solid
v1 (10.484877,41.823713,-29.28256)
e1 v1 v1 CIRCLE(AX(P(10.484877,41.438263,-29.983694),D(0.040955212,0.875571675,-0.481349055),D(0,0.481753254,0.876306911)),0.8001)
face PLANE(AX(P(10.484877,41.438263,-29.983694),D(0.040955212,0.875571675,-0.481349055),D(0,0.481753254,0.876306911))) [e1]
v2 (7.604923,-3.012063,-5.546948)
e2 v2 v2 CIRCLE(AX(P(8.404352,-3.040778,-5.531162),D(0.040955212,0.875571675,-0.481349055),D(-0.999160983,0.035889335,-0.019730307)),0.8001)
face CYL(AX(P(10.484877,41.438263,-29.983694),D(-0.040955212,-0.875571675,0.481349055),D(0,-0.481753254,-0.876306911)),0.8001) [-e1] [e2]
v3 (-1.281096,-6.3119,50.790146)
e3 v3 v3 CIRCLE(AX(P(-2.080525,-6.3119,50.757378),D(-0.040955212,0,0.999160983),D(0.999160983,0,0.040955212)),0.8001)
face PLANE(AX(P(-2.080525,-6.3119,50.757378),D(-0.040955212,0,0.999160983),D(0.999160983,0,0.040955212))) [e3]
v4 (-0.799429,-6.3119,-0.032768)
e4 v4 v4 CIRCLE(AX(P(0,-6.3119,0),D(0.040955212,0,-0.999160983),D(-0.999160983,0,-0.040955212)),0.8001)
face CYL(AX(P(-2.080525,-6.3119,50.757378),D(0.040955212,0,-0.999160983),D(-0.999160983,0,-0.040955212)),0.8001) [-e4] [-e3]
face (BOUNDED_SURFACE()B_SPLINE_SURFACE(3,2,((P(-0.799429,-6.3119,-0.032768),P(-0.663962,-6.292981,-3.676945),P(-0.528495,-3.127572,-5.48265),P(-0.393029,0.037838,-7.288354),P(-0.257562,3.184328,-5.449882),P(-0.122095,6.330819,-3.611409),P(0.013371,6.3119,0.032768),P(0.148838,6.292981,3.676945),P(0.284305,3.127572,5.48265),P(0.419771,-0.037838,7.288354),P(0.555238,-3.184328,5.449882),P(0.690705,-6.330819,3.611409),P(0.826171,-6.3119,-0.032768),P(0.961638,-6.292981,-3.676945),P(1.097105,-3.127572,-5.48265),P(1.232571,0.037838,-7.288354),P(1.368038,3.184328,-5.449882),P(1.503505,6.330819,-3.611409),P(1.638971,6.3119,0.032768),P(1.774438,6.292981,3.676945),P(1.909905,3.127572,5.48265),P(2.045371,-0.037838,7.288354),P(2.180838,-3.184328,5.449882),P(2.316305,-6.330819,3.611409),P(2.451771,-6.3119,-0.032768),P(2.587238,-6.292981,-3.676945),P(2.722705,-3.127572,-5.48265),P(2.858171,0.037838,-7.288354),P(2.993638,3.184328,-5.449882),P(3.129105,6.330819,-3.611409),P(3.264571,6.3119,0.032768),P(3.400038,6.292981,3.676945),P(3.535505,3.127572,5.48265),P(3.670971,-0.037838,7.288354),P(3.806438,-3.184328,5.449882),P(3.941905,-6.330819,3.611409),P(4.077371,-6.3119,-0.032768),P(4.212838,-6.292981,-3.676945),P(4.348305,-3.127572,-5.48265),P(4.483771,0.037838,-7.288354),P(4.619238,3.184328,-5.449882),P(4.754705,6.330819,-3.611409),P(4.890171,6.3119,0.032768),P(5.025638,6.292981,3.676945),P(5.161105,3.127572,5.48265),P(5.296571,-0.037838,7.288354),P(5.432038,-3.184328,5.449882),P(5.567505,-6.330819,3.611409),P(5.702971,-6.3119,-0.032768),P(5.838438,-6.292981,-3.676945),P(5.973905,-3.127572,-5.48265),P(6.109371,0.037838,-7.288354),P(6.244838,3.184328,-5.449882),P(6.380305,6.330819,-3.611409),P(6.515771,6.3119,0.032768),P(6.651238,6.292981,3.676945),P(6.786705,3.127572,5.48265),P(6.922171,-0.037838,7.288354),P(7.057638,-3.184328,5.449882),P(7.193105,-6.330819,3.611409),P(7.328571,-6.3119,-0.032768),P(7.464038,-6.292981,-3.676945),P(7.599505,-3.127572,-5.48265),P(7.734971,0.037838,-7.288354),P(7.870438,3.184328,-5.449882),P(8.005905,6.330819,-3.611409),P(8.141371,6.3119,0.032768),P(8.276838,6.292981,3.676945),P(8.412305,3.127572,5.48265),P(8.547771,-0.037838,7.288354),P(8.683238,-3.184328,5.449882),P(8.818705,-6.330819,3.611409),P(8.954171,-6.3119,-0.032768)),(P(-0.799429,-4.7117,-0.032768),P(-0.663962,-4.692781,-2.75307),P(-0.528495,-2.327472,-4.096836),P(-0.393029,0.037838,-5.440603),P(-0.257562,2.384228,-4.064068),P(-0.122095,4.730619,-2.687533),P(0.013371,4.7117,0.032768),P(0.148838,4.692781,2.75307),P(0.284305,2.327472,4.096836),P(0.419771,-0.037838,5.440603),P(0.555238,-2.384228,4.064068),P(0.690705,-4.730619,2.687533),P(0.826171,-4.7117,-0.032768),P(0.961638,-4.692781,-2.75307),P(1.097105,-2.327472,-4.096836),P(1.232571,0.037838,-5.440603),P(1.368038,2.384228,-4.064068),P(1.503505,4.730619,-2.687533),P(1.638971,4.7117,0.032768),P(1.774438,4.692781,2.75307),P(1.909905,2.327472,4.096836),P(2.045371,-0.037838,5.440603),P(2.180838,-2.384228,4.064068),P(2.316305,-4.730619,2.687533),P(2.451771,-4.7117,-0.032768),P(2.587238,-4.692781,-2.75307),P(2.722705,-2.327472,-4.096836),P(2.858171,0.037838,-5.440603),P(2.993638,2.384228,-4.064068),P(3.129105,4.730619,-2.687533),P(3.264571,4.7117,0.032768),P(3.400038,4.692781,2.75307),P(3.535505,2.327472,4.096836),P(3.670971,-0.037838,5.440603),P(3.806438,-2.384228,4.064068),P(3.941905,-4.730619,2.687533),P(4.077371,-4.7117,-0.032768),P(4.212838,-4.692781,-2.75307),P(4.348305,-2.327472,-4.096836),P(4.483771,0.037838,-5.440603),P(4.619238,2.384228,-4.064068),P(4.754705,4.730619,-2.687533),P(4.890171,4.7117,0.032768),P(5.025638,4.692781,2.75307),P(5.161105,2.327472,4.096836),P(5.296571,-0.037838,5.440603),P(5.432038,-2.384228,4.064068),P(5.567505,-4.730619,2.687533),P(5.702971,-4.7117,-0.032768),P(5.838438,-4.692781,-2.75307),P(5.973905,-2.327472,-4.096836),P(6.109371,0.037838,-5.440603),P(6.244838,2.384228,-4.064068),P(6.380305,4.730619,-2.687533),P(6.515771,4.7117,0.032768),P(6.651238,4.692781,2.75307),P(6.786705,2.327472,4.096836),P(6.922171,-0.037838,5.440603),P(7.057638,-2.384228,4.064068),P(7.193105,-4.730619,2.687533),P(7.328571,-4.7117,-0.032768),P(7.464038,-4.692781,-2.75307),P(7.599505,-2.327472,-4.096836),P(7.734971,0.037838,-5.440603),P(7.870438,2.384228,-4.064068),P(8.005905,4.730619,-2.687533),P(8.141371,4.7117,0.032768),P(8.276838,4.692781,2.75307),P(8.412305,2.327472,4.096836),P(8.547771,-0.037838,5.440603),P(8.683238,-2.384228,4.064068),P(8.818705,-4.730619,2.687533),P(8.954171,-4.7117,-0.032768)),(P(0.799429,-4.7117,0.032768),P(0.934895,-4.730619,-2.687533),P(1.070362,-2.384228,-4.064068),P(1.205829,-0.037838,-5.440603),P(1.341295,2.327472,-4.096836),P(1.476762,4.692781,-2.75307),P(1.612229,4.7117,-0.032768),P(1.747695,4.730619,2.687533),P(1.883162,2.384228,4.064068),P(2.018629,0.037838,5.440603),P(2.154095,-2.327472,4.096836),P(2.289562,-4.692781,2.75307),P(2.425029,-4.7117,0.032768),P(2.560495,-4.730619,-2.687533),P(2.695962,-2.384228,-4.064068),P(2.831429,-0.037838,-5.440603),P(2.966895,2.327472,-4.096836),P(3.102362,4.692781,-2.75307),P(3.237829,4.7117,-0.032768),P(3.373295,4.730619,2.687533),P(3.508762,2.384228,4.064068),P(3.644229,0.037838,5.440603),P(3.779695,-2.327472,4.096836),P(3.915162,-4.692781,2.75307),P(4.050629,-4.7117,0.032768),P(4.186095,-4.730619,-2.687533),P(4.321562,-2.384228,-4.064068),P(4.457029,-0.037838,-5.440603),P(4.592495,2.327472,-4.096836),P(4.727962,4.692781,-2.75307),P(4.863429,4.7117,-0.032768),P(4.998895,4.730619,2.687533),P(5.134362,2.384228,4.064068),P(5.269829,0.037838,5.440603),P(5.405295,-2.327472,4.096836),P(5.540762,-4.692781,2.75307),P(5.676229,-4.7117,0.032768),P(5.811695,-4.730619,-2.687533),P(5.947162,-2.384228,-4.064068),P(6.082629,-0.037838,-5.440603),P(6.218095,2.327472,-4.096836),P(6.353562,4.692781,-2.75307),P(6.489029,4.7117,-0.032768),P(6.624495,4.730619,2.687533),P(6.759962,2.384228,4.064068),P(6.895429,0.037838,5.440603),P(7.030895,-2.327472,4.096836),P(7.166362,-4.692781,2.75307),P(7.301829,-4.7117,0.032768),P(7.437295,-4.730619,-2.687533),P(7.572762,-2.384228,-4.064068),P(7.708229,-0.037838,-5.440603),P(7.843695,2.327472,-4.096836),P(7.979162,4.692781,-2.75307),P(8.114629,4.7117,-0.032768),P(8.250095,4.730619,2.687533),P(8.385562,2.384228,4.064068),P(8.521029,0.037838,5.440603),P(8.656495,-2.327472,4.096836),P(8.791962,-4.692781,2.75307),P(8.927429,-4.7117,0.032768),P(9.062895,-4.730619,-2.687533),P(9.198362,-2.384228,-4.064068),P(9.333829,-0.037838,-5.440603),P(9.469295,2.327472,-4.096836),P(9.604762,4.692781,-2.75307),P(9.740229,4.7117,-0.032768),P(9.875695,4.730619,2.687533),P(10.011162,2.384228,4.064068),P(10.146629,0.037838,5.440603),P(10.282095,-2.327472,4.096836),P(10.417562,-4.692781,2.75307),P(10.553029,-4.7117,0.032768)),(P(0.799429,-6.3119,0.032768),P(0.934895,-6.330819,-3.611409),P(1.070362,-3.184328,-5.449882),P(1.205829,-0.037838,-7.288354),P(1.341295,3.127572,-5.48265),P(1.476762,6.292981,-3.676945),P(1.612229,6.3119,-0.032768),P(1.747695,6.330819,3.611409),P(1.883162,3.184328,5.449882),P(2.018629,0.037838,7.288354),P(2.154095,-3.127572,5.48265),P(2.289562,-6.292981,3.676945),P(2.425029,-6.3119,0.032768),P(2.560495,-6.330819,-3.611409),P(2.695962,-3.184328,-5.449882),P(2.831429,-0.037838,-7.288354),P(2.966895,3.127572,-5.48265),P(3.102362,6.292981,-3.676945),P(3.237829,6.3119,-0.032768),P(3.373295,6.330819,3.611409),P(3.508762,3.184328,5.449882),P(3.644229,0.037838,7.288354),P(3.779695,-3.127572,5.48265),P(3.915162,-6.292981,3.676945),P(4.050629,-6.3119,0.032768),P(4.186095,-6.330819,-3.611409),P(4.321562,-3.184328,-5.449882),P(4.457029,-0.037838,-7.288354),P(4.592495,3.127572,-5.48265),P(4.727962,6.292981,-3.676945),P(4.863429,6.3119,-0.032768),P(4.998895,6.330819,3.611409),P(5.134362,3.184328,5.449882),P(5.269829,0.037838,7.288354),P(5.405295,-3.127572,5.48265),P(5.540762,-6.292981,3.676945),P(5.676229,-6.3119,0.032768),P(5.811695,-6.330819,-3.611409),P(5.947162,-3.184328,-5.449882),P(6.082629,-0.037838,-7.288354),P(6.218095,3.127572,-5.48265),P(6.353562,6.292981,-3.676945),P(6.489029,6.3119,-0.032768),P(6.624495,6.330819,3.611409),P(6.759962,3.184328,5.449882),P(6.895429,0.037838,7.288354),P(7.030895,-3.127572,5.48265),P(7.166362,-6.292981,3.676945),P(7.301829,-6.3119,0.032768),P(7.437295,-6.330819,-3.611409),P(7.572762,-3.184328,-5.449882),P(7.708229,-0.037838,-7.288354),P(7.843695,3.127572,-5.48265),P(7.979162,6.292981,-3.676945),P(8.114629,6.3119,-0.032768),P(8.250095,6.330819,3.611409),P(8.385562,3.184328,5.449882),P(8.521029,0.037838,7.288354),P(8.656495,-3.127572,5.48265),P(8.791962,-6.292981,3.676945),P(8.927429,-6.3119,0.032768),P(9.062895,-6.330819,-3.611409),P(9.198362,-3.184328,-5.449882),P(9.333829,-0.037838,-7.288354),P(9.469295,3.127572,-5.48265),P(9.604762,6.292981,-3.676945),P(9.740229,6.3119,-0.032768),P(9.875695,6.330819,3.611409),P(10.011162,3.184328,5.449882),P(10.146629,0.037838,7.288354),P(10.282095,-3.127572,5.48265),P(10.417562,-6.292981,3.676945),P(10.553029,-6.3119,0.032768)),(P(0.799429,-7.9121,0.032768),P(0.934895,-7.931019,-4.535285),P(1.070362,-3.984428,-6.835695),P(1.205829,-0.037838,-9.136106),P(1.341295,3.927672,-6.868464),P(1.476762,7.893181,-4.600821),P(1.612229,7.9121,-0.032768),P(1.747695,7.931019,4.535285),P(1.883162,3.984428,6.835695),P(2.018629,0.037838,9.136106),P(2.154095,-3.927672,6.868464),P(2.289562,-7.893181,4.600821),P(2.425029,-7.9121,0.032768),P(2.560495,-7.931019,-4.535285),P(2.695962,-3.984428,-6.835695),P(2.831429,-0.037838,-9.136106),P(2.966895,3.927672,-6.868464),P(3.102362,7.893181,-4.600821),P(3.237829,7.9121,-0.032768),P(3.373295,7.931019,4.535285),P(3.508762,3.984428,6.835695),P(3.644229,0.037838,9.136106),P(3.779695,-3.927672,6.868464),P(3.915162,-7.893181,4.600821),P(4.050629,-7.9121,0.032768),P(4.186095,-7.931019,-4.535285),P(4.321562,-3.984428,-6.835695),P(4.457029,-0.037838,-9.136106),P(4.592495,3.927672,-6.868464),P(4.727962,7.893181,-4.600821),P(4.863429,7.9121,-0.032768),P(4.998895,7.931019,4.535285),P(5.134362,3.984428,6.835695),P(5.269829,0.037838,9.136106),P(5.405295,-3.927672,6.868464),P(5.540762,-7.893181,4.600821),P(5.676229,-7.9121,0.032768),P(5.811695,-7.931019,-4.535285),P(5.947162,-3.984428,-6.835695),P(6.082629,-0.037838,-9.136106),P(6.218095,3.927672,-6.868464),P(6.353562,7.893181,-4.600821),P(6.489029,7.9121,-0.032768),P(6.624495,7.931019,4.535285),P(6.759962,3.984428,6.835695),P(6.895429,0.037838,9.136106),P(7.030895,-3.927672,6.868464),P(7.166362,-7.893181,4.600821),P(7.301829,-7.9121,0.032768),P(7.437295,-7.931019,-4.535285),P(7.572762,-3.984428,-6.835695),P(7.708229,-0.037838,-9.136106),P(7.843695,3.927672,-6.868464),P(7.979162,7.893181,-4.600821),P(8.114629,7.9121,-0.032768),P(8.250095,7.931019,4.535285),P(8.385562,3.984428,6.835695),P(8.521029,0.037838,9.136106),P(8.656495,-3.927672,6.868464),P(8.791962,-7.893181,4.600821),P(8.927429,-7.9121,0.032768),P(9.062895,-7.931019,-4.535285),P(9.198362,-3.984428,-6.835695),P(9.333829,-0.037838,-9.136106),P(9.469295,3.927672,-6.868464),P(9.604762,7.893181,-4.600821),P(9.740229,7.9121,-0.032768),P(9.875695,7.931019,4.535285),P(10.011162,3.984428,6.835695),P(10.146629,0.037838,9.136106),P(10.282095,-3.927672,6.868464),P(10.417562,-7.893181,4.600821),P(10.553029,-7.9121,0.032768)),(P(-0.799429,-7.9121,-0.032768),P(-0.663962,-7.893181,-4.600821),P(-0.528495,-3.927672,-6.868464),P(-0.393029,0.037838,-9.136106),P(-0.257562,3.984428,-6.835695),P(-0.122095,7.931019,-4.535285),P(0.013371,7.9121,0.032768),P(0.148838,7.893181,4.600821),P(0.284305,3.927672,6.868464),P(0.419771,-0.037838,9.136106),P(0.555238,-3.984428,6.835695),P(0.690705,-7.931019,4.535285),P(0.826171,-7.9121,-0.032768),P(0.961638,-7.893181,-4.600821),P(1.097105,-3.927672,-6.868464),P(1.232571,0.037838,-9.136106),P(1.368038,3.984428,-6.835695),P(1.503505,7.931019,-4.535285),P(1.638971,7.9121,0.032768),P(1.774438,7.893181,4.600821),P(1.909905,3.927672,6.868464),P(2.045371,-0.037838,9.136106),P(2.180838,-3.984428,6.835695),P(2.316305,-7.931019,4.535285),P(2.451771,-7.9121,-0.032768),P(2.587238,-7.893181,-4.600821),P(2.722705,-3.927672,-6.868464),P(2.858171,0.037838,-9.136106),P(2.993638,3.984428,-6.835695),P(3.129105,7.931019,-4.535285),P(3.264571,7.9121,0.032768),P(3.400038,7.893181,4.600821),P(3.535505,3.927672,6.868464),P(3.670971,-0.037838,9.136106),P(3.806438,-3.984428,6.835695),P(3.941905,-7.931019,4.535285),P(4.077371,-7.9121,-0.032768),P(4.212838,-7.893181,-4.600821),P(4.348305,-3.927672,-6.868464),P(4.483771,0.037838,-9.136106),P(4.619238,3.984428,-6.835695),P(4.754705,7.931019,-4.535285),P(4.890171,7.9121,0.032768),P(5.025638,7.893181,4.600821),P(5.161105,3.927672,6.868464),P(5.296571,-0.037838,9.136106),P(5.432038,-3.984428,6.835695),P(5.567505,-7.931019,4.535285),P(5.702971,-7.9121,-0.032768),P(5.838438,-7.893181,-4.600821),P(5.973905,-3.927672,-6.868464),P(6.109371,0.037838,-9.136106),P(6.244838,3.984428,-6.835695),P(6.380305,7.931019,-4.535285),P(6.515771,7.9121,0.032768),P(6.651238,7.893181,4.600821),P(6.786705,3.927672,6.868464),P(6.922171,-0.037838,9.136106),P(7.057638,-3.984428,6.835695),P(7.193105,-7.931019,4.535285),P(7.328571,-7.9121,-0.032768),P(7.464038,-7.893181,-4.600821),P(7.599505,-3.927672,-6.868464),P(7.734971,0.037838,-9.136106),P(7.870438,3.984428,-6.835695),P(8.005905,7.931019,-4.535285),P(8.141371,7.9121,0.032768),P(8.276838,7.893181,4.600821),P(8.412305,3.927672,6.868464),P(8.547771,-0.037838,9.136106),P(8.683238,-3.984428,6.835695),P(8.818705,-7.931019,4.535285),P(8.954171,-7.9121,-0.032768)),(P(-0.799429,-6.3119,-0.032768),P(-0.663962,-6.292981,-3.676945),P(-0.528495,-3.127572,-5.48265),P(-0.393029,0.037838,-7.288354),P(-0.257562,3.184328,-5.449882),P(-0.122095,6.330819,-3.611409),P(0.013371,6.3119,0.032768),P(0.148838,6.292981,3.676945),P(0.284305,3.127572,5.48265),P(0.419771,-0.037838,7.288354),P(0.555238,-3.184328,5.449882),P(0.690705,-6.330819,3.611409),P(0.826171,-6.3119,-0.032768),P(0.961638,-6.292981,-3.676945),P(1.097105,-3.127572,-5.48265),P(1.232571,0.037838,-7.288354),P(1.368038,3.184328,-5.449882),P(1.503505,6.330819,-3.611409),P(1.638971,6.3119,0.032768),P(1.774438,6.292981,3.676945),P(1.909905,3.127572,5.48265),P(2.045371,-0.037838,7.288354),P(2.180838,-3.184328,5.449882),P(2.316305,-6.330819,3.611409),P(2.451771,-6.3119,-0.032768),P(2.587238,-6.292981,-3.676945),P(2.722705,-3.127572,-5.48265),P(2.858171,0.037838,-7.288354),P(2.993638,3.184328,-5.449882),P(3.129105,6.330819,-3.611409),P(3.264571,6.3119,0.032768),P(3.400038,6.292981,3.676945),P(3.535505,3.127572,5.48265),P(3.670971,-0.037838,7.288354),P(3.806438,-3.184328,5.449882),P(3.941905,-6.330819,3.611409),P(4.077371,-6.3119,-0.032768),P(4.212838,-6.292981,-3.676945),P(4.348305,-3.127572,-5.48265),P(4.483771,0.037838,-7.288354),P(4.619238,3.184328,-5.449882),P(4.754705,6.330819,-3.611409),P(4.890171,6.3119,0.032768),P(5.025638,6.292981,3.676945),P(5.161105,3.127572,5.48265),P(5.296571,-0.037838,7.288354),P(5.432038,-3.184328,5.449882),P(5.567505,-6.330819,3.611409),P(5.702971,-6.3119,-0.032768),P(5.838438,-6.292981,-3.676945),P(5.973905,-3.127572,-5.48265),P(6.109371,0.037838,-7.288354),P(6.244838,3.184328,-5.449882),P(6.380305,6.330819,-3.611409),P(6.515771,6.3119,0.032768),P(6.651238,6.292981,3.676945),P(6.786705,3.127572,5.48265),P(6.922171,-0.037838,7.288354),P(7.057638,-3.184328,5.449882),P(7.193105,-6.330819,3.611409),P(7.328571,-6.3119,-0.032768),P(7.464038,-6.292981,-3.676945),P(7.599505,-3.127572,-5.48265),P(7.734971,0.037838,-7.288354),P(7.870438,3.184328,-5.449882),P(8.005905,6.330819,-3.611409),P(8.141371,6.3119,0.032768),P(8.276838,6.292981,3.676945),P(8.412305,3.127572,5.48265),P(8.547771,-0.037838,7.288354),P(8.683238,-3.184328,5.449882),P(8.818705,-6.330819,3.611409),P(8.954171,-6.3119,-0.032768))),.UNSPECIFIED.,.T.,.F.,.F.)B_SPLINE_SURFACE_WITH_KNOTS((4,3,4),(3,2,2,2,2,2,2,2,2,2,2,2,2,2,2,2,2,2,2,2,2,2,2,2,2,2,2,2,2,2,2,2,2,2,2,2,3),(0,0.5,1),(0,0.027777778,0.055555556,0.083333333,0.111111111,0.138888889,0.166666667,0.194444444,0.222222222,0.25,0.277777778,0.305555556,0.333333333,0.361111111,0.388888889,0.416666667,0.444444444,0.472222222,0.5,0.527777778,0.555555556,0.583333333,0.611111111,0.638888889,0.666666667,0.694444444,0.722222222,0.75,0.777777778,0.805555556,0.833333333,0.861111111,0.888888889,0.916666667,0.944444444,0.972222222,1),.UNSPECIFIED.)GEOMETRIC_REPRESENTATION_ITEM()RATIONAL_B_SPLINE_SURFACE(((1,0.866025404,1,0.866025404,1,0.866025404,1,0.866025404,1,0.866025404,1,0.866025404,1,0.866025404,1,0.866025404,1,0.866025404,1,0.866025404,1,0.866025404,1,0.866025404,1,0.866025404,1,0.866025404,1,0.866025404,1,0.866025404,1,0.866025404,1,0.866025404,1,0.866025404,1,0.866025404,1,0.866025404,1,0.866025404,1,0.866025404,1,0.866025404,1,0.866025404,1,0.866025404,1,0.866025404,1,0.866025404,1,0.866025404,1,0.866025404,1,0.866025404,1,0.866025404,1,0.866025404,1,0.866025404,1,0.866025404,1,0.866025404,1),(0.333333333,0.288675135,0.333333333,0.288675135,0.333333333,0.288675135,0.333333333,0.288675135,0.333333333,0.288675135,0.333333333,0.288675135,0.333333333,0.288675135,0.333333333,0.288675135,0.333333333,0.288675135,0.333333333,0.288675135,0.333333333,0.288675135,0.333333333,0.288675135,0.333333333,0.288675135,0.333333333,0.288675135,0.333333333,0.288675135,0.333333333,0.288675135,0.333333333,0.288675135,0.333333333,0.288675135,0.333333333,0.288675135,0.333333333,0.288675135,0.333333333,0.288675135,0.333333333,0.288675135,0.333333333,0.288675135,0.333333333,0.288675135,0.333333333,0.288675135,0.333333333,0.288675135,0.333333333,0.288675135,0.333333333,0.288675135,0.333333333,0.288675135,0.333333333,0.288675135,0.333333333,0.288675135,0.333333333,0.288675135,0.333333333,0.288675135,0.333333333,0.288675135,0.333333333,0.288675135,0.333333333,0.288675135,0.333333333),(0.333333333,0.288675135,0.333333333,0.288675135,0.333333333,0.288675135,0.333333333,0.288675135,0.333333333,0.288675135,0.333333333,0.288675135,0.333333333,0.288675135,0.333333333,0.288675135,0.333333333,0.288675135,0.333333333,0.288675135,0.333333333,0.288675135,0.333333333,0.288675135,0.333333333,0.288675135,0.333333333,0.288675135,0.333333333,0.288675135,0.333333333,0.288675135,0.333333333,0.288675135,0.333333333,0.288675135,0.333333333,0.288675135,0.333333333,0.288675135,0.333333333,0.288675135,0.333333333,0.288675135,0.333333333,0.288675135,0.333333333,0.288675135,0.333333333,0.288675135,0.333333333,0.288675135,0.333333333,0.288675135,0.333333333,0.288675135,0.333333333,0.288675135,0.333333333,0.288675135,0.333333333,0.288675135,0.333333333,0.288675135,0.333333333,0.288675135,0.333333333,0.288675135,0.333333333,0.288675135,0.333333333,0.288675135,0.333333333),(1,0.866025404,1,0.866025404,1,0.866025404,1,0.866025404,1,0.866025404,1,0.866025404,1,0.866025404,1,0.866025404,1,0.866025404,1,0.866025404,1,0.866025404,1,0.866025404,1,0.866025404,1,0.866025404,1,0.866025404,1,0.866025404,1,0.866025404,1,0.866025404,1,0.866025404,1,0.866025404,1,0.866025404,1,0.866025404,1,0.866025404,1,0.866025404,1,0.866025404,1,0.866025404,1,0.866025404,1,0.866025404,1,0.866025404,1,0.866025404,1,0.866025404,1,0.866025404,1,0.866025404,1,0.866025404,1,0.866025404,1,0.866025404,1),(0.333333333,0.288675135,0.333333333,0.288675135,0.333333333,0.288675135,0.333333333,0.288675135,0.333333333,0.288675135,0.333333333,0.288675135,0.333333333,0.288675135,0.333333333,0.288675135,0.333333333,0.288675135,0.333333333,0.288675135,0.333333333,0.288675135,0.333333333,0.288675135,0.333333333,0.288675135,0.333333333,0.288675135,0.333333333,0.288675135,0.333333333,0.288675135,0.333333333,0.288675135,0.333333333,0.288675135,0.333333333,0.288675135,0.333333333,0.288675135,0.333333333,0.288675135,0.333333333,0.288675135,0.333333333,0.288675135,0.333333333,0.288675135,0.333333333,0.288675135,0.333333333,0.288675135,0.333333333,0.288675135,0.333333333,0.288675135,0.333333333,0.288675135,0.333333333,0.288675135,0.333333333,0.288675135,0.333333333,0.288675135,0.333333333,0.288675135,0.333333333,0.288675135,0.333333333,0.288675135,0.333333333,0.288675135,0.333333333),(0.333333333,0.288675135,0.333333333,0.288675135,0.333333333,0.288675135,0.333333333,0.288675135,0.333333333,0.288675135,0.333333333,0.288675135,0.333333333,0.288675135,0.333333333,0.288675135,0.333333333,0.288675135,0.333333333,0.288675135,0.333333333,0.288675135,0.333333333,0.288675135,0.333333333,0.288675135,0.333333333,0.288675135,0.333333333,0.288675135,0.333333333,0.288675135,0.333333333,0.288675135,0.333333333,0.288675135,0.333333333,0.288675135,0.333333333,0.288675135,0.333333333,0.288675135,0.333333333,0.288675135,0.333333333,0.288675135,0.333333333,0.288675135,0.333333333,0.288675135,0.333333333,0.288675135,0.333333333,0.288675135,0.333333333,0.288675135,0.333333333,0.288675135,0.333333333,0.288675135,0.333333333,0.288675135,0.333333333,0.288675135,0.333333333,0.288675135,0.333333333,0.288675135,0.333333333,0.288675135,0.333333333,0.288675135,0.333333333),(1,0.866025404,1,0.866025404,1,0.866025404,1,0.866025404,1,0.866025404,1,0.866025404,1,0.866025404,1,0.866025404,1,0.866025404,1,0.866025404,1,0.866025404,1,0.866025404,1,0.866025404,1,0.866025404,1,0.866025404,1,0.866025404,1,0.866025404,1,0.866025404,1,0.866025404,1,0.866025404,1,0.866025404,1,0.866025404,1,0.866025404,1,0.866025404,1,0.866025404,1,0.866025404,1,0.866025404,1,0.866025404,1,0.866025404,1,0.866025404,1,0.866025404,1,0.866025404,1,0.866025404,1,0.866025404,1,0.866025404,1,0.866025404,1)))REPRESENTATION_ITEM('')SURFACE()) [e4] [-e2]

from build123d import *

# Parameters (mm, degrees)
SWEEP1_PITCH   = 1.6256
SKETCH3_R      = 0.8001
EXTRUDE1_DEPTH = 50.8
SKETCH4_R      = 0.8001
EXTRUDE2_DEPTH = 50.8


with BuildPart() as part:
    # Sweep1: the profile of Sketch2 screwed along a right-hand helix of 5.17 turns, 6 arcs to a turn; built about Z, then put on its axis
    sweep1_z = Axis((0, 0, 0), (0, 0, 1))
    sweep1_corners = [(6.240771643, -0.032638523, 0.796263457), (7.108832097, -0.002913077, 0.071068679), (6.383028357, 0.032638523, -0.796263457), (5.514967903, 0.002913077, -0.071068679)]
    with BuildLine(mode=Mode.PRIVATE) as sweep1_profile:
        ThreePointArc((6.240771643, -0.032638523, 0.796263457), (6.825120746, -0.025138777, 0.613296435), (7.108832097, -0.002913077, 0.071068679))
        ThreePointArc((7.108832097, -0.002913077, 0.071068679), (6.925711433, 0.021019065, -0.512790146), (6.383028357, 0.032638523, -0.796263457))
        ThreePointArc((6.383028357, 0.032638523, -0.796263457), (5.798679254, 0.025138777, -0.613296435), (5.514967903, 0.002913077, -0.071068679))
        ThreePointArc((5.514967903, 0.002913077, -0.071068679), (5.698088567, -0.021019065, 0.512790146), (6.240771643, -0.032638523, 0.796263457))
    sweep1_cap = Face(sweep1_profile.wire())
    sweep1_arcs = [((6.240771643, -0.032638523, 0.796263457), (7.03770374, -0.0355516, 0.867332136), (7.108832097, -0.002913077, 0.071068679), (1, 0.7071067811865476, 1)), ((7.108832097, -0.002913077, 0.071068679), (7.179960453, 0.029725446, -0.725194779), (6.383028357, 0.032638523, -0.796263457), (1, 0.7071067811865476, 1)), ((6.383028357, 0.032638523, -0.796263457), (5.58609626, 0.0355516, -0.867332136), (5.514967903, 0.002913077, -0.071068679), (1, 0.7071067811865476, 1)), ((5.514967903, 0.002913077, -0.071068679), (5.443839547, -0.029725446, 0.725194779), (6.240771643, -0.032638523, 0.796263457), (1, 0.7071067811865476, 1))]  # start, shoulder, end, weights
    sweep1_turn_angles = [0, 30, 60, 90, 120, 150, 180, 210, 240, 270, 300, 330, 360]
    sweep1_turn_weights = [1, 0.8660254037844387, 1, 0.8660254037844387, 1, 0.8660254037844387, 1, 0.8660254037844387, 1, 0.8660254037844387, 1, 0.8660254037844387, 1]
    sweep1_turn_sides = [Face.make_bezier_surface([[Vector(p[j][0], p[j][1], 0).rotate(sweep1_z, sweep1_turn_angles[2 * i + k]) / sweep1_turn_weights[2 * i + k] + Vector(0, 0, p[j][2] + SWEEP1_PITCH * sweep1_turn_angles[2 * i + k] / 360) for k in range(3)] for j in range(3)], [[p[3][j] * sweep1_turn_weights[2 * i + k] for k in range(3)] for j in range(3)]) for p in sweep1_arcs for i in range(6)]
    sweep1_last_angles = [1800, 1830, 1860, 1860.600013733, 1861.200027466]
    sweep1_last_weights = [1, 0.8660254037844387, 1, 0.999945166855559, 1]
    sweep1_last_sides = [Face.make_bezier_surface([[Vector(p[j][0], p[j][1], 0).rotate(sweep1_z, sweep1_last_angles[2 * i + k]) / sweep1_last_weights[2 * i + k] + Vector(0, 0, p[j][2] + SWEEP1_PITCH * sweep1_last_angles[2 * i + k] / 360) for k in range(3)] for j in range(3)], [[p[3][j] * sweep1_last_weights[2 * i + k] for k in range(3)] for j in range(3)]) for p in sweep1_arcs for i in range(2)]
    sweep1 = Plane(origin=(0, 0, 0), x_dir=(0, -1, 0), z_dir=(1, 0, 0)) * Solid(Shell([*[p.moved(Location((0, 0, SWEEP1_PITCH * i))) for i in range(5) for p in sweep1_turn_sides], *sweep1_last_sides, sweep1_cap, sweep1_cap.rotate(sweep1_z, 1861.200027466).moved(Location((0, 0, SWEEP1_PITCH * 1861.200027466 / 360)))]))
    add(sweep1)

    # Sketch3 → Extrude1 (add)
    with BuildSketch(Plane(origin=(0, 0, 0), x_dir=(-0.995204921217187, -0.08889933338030673, -0.04079305467392493), z_dir=(-0.04095521208944009, -1.1512926029189078e-14, 0.9991609833268658))):
        with Locations(Location((0.561123702, 6.286908764, 0), (0, 0, 354.899710282))):
            Circle(SKETCH3_R)
    extrude(amount=EXTRUDE1_DEPTH)

    # Sketch4 → Extrude2 (add)
    with BuildSketch(Plane(origin=(0.014096867, 0.301373542, -0.165681319), x_dir=(0.9927938523752088, -0.08996075583046607, -0.07916709604629732), z_dir=(0.04095521208944012, 0.8755716748724814, -0.4813490550148685))):
        with Locations(Location((9.055225843, 5.325187897, 0), (0, 0, 173.528235798))):
            Circle(SKETCH4_R)
    extrude(amount=EXTRUDE2_DEPTH)


solid = part.part
